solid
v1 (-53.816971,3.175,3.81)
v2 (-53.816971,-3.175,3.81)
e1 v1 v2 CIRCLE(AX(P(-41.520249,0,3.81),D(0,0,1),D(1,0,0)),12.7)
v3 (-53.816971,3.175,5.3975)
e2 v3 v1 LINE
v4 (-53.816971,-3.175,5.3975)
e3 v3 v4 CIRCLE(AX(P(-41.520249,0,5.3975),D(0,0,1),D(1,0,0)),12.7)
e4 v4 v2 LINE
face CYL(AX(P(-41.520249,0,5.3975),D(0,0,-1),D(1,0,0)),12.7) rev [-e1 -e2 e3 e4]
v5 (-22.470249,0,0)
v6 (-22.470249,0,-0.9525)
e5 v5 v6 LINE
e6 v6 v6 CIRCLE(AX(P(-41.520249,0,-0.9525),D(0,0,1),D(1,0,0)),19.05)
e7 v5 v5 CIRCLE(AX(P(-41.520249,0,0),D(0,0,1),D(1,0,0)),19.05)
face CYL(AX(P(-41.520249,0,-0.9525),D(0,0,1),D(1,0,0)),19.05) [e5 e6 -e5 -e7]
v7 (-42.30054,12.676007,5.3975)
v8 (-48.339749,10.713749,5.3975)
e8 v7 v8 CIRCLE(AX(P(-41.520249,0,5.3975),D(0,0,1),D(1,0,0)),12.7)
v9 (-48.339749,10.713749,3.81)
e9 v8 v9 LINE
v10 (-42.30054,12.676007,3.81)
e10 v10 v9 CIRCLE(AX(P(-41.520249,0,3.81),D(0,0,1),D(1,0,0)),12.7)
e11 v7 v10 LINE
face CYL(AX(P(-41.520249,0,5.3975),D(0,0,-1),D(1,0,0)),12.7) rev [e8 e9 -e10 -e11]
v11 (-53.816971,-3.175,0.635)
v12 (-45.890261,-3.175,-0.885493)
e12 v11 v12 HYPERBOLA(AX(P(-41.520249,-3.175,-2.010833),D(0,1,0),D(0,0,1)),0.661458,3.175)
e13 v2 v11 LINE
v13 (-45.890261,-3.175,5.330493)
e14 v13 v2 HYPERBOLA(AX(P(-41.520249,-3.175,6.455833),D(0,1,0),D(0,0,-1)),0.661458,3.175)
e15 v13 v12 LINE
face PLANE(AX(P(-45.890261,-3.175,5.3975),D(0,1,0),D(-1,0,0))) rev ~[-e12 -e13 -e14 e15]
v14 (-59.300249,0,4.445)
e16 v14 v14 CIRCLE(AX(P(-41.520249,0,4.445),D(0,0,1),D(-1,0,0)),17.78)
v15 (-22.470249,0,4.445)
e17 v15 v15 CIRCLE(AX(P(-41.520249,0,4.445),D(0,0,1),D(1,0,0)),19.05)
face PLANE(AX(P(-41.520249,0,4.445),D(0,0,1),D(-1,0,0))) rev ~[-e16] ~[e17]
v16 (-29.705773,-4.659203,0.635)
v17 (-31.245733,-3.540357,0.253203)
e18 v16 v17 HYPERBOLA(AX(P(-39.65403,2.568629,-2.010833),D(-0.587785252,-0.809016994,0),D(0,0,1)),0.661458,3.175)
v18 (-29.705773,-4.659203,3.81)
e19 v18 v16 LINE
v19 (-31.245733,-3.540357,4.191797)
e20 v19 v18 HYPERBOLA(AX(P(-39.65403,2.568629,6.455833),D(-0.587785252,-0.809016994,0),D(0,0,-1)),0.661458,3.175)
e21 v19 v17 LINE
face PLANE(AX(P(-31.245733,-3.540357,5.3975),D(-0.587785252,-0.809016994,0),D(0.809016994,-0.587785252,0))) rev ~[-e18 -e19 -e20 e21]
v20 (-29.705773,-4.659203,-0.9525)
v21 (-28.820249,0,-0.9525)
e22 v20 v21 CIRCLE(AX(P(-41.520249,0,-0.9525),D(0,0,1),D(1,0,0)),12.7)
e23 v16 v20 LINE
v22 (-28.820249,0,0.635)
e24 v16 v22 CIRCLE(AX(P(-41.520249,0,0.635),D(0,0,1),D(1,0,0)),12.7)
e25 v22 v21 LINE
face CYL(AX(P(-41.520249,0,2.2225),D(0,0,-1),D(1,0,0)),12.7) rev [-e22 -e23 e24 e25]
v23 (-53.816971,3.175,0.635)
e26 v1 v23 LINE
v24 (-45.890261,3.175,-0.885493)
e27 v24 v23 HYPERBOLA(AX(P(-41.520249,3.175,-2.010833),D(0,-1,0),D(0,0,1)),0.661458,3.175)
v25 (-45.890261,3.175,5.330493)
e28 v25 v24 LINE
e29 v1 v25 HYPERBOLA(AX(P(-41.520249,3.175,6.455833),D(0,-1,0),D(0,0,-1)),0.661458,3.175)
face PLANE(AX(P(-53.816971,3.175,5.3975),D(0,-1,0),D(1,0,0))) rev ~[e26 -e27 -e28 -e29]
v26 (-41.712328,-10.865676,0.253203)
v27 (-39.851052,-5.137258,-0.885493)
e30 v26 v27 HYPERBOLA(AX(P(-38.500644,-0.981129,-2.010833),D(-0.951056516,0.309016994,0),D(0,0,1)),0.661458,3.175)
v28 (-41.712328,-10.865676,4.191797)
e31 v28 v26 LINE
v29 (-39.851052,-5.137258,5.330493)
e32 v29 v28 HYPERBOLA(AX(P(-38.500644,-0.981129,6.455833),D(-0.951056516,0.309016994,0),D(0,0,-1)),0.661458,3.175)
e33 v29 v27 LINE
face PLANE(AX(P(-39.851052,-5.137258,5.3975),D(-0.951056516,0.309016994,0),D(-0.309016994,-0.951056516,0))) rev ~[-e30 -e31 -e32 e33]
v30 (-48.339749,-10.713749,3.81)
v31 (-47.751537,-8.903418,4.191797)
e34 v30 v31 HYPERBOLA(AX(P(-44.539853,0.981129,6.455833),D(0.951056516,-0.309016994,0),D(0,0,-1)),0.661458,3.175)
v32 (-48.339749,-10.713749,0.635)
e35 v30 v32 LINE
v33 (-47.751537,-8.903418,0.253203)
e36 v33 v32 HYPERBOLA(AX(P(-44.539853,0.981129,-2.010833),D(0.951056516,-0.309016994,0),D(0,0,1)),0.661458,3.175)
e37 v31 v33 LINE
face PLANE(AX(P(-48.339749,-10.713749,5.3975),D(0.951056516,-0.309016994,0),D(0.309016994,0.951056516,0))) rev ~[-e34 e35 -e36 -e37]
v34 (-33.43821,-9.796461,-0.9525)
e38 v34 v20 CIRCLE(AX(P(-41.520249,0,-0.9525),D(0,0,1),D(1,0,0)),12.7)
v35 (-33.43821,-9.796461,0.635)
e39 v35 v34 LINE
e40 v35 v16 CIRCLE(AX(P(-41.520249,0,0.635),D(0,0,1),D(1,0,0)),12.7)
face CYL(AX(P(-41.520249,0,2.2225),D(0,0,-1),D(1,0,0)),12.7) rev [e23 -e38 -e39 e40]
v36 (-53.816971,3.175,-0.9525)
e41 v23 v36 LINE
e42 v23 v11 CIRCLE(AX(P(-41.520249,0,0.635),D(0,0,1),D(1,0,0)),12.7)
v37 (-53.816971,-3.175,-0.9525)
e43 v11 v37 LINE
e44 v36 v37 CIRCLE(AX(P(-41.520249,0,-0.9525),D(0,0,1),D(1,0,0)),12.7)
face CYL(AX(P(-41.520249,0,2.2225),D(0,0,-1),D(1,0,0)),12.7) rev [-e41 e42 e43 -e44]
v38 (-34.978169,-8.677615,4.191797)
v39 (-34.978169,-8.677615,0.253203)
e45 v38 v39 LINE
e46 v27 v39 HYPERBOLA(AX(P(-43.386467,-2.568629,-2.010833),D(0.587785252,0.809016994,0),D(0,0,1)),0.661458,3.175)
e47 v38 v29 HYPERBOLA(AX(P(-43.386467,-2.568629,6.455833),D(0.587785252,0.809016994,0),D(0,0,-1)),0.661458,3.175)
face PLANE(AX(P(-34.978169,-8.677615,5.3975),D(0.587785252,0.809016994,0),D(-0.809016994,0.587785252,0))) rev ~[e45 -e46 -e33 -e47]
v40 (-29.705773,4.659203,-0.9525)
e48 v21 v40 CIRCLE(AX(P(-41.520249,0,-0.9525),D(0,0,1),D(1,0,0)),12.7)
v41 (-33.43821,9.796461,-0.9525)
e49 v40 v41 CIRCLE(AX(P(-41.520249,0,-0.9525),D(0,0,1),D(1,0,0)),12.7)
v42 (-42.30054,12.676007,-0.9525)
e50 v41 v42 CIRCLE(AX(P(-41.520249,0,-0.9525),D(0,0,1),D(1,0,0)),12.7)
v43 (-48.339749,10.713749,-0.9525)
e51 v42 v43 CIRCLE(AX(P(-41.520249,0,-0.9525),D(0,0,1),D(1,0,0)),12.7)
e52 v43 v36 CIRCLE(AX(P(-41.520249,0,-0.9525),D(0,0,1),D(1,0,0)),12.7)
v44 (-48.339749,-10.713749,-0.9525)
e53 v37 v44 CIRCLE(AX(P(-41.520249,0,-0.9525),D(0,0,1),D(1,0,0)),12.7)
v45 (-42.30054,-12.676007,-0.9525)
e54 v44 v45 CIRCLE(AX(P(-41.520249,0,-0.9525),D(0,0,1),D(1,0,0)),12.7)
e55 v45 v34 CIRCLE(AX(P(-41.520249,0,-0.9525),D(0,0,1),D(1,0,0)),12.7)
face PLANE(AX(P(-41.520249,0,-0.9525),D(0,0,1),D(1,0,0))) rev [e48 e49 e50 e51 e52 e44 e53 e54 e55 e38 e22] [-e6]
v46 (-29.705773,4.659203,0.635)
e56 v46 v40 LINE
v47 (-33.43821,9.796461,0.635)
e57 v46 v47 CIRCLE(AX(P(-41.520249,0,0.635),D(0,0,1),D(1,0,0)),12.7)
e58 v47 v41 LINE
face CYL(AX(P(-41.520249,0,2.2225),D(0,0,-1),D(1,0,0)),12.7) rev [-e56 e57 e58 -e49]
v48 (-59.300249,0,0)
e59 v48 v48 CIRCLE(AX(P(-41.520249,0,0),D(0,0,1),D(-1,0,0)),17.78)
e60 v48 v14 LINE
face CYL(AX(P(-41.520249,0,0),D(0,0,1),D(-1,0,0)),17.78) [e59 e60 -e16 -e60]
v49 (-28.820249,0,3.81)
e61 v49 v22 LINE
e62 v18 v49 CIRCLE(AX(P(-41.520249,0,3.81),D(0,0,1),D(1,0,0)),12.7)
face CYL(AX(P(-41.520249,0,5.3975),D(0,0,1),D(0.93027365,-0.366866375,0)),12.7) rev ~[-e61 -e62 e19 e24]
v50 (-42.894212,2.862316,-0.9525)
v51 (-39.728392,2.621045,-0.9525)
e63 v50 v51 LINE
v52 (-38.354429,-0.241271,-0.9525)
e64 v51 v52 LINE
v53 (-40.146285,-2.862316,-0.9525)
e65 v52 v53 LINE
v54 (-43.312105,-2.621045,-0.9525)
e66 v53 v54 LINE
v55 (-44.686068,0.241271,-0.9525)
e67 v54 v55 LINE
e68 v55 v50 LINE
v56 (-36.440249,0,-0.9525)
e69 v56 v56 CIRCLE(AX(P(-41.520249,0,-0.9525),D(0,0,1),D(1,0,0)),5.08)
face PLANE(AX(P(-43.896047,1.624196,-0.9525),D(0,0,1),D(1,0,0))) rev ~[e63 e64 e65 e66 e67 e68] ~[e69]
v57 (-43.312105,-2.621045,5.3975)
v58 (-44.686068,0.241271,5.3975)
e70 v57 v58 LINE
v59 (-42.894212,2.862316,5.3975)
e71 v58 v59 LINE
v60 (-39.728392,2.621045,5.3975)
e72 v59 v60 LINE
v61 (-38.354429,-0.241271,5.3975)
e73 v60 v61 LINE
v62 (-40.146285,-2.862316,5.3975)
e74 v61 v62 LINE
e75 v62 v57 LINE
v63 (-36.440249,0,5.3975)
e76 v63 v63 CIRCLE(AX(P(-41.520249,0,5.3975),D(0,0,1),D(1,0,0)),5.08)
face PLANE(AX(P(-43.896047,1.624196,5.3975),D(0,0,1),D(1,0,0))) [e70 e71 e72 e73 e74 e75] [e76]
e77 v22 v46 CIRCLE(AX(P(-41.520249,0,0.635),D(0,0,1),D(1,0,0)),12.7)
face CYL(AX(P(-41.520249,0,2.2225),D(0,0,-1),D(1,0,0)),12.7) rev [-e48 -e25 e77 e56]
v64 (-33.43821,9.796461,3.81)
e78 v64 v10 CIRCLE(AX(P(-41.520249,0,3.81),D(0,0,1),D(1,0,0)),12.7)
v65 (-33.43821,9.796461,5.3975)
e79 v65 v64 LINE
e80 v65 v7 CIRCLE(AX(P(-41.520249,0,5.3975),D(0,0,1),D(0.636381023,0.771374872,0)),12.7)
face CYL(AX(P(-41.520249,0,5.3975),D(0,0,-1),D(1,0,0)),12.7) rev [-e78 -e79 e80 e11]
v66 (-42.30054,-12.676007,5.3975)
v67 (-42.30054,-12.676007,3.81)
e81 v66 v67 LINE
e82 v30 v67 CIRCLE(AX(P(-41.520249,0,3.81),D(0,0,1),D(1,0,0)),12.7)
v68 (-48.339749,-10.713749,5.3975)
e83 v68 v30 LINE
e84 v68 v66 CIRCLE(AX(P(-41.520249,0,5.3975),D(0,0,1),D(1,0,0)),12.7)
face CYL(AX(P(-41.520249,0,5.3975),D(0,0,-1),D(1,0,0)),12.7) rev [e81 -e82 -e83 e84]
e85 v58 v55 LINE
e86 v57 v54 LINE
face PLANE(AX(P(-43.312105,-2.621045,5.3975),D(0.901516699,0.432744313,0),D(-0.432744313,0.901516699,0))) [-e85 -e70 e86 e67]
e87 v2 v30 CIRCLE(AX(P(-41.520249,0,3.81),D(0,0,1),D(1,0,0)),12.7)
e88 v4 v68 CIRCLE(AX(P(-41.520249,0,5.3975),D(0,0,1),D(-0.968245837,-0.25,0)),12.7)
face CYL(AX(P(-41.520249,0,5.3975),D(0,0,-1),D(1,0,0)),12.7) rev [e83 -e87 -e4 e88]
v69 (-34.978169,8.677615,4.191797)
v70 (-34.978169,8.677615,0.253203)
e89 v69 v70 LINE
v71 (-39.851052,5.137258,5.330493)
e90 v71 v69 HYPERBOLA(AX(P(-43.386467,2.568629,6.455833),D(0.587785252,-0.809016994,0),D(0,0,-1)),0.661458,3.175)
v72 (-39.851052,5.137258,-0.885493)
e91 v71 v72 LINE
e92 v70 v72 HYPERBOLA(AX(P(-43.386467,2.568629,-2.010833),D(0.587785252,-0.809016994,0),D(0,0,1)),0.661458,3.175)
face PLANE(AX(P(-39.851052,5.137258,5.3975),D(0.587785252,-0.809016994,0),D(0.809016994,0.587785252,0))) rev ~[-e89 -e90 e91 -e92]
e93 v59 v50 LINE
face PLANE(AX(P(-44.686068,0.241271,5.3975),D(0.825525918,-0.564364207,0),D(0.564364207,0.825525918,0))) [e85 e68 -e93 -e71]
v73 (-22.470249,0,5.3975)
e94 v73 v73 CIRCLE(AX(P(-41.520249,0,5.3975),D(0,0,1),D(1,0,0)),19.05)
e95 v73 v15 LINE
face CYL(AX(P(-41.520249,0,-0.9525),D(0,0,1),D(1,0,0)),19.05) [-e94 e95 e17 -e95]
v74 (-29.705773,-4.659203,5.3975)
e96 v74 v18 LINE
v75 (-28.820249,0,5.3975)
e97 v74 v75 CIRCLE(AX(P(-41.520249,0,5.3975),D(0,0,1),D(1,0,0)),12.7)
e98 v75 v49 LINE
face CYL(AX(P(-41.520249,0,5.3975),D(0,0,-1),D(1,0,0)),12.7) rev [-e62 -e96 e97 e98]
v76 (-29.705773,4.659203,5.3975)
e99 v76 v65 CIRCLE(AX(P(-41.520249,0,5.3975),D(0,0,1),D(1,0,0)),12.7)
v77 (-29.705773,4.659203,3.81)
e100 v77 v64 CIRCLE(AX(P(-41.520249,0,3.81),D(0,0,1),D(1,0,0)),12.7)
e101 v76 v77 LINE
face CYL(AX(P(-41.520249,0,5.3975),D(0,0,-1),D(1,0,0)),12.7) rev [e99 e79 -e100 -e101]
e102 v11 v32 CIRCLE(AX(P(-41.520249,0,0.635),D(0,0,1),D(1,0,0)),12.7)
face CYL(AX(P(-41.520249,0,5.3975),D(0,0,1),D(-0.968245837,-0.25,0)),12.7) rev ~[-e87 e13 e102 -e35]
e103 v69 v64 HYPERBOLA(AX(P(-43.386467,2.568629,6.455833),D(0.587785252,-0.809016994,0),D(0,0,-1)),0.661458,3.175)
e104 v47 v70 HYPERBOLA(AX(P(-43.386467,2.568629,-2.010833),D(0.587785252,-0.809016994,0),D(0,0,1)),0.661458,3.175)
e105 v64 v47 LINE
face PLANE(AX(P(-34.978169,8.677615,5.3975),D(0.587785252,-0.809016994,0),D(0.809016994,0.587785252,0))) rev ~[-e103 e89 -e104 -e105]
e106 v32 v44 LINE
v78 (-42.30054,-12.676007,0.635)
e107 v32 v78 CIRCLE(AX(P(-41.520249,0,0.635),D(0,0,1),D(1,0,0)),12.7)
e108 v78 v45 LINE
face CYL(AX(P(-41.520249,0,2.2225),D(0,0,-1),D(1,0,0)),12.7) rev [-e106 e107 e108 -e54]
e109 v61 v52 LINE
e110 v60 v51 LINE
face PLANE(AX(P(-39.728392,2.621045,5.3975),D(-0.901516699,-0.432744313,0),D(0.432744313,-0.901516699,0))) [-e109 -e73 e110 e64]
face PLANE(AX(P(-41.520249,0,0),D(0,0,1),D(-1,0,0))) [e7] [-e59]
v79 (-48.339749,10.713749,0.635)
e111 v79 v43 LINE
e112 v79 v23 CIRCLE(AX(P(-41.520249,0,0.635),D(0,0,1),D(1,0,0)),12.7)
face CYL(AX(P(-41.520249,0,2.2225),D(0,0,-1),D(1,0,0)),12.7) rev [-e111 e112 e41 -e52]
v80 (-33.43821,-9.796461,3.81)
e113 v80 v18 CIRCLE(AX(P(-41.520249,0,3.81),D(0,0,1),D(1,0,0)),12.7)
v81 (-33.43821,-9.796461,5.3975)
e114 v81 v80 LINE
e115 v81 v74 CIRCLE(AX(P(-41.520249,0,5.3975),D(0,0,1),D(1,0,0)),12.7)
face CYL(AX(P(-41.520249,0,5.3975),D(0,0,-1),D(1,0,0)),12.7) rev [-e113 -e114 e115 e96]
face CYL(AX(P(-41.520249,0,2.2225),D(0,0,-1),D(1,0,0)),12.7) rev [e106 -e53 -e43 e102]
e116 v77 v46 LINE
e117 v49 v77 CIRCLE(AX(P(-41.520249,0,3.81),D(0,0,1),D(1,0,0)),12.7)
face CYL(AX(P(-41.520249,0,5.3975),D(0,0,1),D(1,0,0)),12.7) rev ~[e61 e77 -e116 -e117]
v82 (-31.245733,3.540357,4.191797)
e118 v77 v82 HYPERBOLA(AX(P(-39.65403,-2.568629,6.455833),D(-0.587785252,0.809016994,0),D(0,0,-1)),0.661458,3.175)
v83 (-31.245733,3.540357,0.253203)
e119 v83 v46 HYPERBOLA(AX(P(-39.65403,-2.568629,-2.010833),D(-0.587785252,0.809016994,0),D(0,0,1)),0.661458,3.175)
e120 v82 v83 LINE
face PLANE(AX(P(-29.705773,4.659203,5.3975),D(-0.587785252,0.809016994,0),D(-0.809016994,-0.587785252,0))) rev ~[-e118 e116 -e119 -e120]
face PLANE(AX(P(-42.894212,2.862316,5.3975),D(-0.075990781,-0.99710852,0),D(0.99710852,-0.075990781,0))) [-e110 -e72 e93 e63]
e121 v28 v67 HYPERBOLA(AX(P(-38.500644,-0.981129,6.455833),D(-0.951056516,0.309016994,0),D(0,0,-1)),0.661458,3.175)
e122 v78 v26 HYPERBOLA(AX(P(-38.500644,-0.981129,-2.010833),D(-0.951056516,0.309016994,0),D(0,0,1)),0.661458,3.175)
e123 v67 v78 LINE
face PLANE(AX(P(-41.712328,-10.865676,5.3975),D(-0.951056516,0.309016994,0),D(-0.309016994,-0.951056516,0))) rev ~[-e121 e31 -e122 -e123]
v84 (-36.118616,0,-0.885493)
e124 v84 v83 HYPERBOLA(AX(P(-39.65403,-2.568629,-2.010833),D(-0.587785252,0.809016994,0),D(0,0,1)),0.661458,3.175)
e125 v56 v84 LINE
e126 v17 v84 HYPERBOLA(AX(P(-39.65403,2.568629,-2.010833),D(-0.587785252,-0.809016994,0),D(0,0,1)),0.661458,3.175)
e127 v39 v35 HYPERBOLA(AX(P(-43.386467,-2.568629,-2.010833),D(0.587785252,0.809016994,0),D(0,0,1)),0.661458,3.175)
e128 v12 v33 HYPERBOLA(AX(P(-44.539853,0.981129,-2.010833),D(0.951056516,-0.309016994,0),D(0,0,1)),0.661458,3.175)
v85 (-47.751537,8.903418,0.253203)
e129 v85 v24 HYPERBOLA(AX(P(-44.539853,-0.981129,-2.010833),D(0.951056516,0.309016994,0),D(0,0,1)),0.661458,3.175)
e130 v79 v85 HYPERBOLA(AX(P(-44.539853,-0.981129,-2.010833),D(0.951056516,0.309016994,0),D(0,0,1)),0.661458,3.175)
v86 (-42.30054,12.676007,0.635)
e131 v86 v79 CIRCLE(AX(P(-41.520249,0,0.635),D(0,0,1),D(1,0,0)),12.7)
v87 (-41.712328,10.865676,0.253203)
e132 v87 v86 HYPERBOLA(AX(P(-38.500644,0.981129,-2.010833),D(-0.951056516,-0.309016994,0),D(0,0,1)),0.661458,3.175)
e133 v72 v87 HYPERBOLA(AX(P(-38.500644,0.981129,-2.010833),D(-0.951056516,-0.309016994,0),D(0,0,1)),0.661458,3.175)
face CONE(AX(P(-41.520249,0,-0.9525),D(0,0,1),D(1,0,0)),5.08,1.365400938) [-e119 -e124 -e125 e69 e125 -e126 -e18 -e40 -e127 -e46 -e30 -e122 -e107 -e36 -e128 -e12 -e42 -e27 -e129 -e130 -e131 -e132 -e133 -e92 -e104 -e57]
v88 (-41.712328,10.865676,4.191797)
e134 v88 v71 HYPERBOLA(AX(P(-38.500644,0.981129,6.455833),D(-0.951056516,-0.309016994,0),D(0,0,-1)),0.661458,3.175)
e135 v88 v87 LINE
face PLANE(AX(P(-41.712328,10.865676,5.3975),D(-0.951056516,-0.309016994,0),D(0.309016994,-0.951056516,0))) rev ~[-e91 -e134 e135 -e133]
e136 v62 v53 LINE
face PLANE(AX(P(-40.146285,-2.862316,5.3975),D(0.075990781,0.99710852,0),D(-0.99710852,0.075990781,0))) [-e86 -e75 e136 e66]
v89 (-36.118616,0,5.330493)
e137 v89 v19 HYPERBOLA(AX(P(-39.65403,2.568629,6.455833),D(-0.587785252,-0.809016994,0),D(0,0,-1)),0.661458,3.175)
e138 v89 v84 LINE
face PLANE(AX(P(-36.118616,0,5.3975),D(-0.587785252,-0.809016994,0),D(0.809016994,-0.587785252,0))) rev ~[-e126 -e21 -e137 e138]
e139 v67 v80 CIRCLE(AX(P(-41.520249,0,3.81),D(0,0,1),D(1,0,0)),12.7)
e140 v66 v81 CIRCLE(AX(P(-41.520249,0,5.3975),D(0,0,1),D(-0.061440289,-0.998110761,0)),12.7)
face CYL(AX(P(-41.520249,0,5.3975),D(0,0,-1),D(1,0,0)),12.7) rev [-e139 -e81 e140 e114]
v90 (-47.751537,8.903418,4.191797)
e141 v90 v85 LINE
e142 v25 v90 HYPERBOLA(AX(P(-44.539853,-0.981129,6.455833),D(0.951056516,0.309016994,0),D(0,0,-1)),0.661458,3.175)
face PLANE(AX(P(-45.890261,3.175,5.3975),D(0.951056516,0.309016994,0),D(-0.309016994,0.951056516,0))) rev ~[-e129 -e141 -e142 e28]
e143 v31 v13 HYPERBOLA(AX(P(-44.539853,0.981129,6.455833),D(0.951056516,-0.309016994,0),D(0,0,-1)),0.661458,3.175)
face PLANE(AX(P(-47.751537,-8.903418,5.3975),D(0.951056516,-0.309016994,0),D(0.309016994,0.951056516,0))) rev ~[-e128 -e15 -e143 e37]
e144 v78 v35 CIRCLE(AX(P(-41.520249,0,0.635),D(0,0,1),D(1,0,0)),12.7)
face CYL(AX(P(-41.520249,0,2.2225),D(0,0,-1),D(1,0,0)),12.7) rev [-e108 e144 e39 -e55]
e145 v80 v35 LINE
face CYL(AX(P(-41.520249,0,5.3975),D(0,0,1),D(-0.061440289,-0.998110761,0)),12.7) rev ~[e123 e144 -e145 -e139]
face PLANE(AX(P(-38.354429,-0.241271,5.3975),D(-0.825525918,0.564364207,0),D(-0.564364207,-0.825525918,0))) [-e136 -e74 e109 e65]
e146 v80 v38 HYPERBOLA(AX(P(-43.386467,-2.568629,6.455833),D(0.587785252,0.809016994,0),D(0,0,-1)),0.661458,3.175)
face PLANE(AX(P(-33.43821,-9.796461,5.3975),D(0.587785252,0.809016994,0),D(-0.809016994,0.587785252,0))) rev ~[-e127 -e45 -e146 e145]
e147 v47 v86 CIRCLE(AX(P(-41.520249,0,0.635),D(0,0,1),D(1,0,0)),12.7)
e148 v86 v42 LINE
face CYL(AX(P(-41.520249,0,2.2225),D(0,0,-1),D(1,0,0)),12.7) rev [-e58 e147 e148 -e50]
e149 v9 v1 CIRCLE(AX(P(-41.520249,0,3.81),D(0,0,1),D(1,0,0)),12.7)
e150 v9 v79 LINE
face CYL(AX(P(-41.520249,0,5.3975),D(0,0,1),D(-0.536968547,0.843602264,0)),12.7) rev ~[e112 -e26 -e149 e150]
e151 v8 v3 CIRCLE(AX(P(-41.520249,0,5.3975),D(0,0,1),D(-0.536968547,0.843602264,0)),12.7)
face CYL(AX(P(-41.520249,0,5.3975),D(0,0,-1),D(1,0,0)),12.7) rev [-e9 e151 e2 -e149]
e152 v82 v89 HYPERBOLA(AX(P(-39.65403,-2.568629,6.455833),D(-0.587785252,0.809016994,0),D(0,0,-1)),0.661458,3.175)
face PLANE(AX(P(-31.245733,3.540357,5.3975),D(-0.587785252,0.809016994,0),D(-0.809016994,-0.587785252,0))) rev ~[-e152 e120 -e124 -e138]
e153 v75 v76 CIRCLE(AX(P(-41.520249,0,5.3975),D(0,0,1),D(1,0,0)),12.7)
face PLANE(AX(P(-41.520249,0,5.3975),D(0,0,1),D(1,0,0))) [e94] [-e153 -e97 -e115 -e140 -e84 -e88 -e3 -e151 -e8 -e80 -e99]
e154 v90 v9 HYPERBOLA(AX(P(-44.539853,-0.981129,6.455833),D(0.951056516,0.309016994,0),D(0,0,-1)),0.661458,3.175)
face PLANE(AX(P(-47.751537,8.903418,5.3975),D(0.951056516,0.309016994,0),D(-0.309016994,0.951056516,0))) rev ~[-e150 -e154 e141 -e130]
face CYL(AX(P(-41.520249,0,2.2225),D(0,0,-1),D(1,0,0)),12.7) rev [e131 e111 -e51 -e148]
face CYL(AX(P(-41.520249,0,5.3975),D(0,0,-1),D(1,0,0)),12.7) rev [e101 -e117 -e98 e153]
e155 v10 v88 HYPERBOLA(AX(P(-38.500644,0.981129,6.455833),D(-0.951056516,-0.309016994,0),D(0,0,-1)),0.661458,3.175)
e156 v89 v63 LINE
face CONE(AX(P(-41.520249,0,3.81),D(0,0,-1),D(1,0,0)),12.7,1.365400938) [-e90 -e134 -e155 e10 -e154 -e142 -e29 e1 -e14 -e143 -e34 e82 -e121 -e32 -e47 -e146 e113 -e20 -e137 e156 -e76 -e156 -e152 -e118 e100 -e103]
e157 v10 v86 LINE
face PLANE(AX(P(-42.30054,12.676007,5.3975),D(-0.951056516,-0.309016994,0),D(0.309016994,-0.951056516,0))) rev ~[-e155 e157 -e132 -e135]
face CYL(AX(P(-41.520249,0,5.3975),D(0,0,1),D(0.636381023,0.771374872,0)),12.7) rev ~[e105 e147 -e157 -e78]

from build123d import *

# Parameters (mm, degrees)
F0_W     = 1.27
F0_H     = 2.2225
F0_W_2   = 7.62
F0_H_2   = 1.5875
F3_DEPTH = 25.4
F6_DEPTH = 6.35


# Not quite as in the source:
# - after a boolean that leaves OpenCascade's solid faulty, fix() repairs it


with BuildPart() as f1:
    # F0 (on Front) → F1 (revolve)
    with BuildSketch(Plane.XZ):
        with Locations((-59.9352485356, 1.11125)):
            Rectangle(F0_W, F0_H)
        with Locations((-59.9352485356, 3.33375)):
            Rectangle(F0_W, F0_H)
        Polygon((-22.4702485356, 5.3975), (-28.8202485356, 5.3975), (-28.8202485356, 3.81), (-28.8202485356, 2.2225), (-22.4702485356, 2.2225), align=None)
        with Locations((-32.6302485356, 3.01625)):
            Rectangle(F0_W_2, F0_H_2)
        Polygon((-36.4402485356, 3.81), (-28.8202485356, 3.81), (-36.4402485356, 5.3975), align=None)
        Polygon((-22.4702485356, -0.9525), (-22.4702485356, 2.2225), (-28.8202485356, 2.2225), (-28.8202485356, 0.635), (-28.8202485356, -0.9525), align=None)
        with Locations((-32.6302485356, 1.42875)):
            Rectangle(F0_W_2, F0_H_2)
        Polygon((-36.4402485356, 2.2225), (-36.4402485356, 3.81), (-36.4402485356, 5.3975), (-38.3452485356, 5.3975), (-38.3452485356, 2.2225), align=None)
        Polygon((-36.4402485356, -0.9525), (-28.8202485356, 0.635), (-36.4402485356, 0.635), align=None)
        Polygon((-36.4402485356, 0.635), (-36.4402485356, 2.2225), (-38.3452485356, 2.2225), (-38.3452485356, -0.9525), (-36.4402485356, -0.9525), align=None)
    revolve(axis=Axis((-41.5202485356, 0, 2.0941267129), (0, 0, 1)))

    add(f1.part.fix(), mode=Mode.REPLACE)

    # F2 (on face) → F3 (cut)
    with BuildSketch(Plane.XY.offset(5.3975)):
        with BuildLine():
            Line((-41.7123280121, 10.8656756712), (-34.9781690591, 8.6776147898))
            Line((-34.9781690591, 8.6776147898), (-33.438209538, 9.7964608733))
            ThreePointArc((-33.438209538, 9.7964608733), (-37.595732707, 12.0784177569), (-42.3005402078, 12.6760066624))
            Line((-42.3005402078, 12.6760066624), (-41.7123280121, 10.8656756712))
        make_face()
        Polygon((-39.8510522546, 5.1372579143), (-34.9781690591, 8.6776147898), (-41.7123280121, 10.8656756712), align=None)
        with BuildLine():
            Line((-51.9134760092, 3.175), (-47.7515368906, 8.9034177569))
            Line((-47.7515368906, 8.9034177569), (-48.3397490863, 10.7137487482))
            ThreePointArc((-48.3397490863, 10.7137487482), (-51.7947643642, 7.4648727041), (-53.8169706598, 3.175))
            Line((-53.8169706598, 3.175), (-51.9134760092, 3.175))
        make_face()
        Polygon((-45.8902611331, 3.175), (-47.7515368906, 8.9034177569), (-51.9134760092, 3.175), align=None)
        with BuildLine():
            Line((-48.3397490863, -10.7137487482), (-47.7515368906, -8.9034177569))
            Line((-47.7515368906, -8.9034177569), (-51.9134760092, -3.175))
            Line((-51.9134760092, -3.175), (-53.8169706598, -3.175))
            ThreePointArc((-53.8169706598, -3.175), (-51.7947643642, -7.4648727041), (-48.3397490863, -10.7137487482))
        make_face()
        Polygon((-51.9134760092, -3.175), (-47.7515368906, -8.9034177569), (-45.8902611331, -3.175), align=None)
        Polygon((-41.7123280121, -10.8656756712), (-34.9781690591, -8.6776147898), (-39.8510522546, -5.1372579143), align=None)
        with BuildLine():
            Line((-33.438209538, -9.7964608733), (-34.9781690591, -8.6776147898))
            Line((-34.9781690591, -8.6776147898), (-41.7123280121, -10.8656756712))
            Line((-41.7123280121, -10.8656756712), (-42.3005402078, -12.6760066624))
            ThreePointArc((-42.3005402078, -12.6760066624), (-37.595732707, -12.0784177569), (-33.438209538, -9.7964608733))
        make_face()
        Polygon((-31.245732707, -3.5403568756), (-31.245732707, 3.5403568756), (-36.1186159026, 0), align=None)
        with BuildLine():
            Line((-29.705773186, 4.659202959), (-31.245732707, 3.5403568756))
            Line((-31.245732707, 3.5403568756), (-31.245732707, -3.5403568756))
            Line((-31.245732707, -3.5403568756), (-29.705773186, -4.659202959))
            ThreePointArc((-29.705773186, -4.659202959), (-29.0435935965, -2.3713037616), (-28.8202485356, 0))
            ThreePointArc((-28.8202485356, 0), (-29.0435935965, 2.3713037616), (-29.705773186, 4.659202959))
        make_face()
    extrude(amount=-F3_DEPTH, mode=Mode.SUBTRACT)

    # F0 (on Front) → F4 (revolve, cut)
    with BuildSketch(Plane.XZ):
        with Locations((-59.9352485356, 3.33375)):
            Rectangle(F0_W, F0_H)
        with Locations((-59.9352485356, 1.11125)):
            Rectangle(F0_W, F0_H)
    revolve(axis=Axis((-41.5202485356, 0, 2.0941267129), (0, 0, 1)), mode=Mode.SUBTRACT)

    add(f1.part.fix(), mode=Mode.REPLACE)

    # F5 (on face) → F6 (join)
    with BuildSketch(Plane.XY.offset(5.3975)):
        with BuildLine():
            Line((-44.6860680874, 0.2412707303), (-42.8942117298, 2.8623155208))
            ThreePointArc((-42.8942117298, 2.8623155208), (-44.1412933261, 1.7918563576), (-44.6860680874, 0.2412707303))
        make_face()
        with BuildLine():
            Line((-43.3121048932, -2.6210447905), (-44.6860680874, 0.2412707303))
            ThreePointArc((-44.6860680874, 0.2412707303), (-44.3825640564, -1.3739631943), (-43.3121048932, -2.6210447905))
        make_face()
        with BuildLine():
            ThreePointArc((-43.3121048932, -2.6210447905), (-41.7615192659, -3.1658195518), (-40.1462853413, -2.8623155208))
            Line((-40.1462853413, -2.8623155208), (-43.3121048932, -2.6210447905))
        make_face()
        with BuildLine():
            ThreePointArc((-40.1462853413, -2.8623155208), (-38.8992037451, -1.7918563576), (-38.3544289838, -0.2412707303))
            Line((-38.3544289838, -0.2412707303), (-40.1462853413, -2.8623155208))
        make_face()
        with BuildLine():
            ThreePointArc((-38.3544289838, -0.2412707303), (-38.3475444778, -0.1207226635), (-38.3452485356, 0))
            ThreePointArc((-38.3452485356, 0), (-38.7122448911, 1.4818031355), (-39.728392178, 2.6210447905))
            Line((-39.728392178, 2.6210447905), (-38.3544289838, -0.2412707303))
        make_face()
        with BuildLine():
            Line((-42.8942117298, 2.8623155208), (-39.728392178, 2.6210447905))
            ThreePointArc((-39.728392178, 2.6210447905), (-41.2789778053, 3.1658195518), (-42.8942117298, 2.8623155208))
        make_face()
    extrude(amount=-F6_DEPTH)


solid = f1.part
